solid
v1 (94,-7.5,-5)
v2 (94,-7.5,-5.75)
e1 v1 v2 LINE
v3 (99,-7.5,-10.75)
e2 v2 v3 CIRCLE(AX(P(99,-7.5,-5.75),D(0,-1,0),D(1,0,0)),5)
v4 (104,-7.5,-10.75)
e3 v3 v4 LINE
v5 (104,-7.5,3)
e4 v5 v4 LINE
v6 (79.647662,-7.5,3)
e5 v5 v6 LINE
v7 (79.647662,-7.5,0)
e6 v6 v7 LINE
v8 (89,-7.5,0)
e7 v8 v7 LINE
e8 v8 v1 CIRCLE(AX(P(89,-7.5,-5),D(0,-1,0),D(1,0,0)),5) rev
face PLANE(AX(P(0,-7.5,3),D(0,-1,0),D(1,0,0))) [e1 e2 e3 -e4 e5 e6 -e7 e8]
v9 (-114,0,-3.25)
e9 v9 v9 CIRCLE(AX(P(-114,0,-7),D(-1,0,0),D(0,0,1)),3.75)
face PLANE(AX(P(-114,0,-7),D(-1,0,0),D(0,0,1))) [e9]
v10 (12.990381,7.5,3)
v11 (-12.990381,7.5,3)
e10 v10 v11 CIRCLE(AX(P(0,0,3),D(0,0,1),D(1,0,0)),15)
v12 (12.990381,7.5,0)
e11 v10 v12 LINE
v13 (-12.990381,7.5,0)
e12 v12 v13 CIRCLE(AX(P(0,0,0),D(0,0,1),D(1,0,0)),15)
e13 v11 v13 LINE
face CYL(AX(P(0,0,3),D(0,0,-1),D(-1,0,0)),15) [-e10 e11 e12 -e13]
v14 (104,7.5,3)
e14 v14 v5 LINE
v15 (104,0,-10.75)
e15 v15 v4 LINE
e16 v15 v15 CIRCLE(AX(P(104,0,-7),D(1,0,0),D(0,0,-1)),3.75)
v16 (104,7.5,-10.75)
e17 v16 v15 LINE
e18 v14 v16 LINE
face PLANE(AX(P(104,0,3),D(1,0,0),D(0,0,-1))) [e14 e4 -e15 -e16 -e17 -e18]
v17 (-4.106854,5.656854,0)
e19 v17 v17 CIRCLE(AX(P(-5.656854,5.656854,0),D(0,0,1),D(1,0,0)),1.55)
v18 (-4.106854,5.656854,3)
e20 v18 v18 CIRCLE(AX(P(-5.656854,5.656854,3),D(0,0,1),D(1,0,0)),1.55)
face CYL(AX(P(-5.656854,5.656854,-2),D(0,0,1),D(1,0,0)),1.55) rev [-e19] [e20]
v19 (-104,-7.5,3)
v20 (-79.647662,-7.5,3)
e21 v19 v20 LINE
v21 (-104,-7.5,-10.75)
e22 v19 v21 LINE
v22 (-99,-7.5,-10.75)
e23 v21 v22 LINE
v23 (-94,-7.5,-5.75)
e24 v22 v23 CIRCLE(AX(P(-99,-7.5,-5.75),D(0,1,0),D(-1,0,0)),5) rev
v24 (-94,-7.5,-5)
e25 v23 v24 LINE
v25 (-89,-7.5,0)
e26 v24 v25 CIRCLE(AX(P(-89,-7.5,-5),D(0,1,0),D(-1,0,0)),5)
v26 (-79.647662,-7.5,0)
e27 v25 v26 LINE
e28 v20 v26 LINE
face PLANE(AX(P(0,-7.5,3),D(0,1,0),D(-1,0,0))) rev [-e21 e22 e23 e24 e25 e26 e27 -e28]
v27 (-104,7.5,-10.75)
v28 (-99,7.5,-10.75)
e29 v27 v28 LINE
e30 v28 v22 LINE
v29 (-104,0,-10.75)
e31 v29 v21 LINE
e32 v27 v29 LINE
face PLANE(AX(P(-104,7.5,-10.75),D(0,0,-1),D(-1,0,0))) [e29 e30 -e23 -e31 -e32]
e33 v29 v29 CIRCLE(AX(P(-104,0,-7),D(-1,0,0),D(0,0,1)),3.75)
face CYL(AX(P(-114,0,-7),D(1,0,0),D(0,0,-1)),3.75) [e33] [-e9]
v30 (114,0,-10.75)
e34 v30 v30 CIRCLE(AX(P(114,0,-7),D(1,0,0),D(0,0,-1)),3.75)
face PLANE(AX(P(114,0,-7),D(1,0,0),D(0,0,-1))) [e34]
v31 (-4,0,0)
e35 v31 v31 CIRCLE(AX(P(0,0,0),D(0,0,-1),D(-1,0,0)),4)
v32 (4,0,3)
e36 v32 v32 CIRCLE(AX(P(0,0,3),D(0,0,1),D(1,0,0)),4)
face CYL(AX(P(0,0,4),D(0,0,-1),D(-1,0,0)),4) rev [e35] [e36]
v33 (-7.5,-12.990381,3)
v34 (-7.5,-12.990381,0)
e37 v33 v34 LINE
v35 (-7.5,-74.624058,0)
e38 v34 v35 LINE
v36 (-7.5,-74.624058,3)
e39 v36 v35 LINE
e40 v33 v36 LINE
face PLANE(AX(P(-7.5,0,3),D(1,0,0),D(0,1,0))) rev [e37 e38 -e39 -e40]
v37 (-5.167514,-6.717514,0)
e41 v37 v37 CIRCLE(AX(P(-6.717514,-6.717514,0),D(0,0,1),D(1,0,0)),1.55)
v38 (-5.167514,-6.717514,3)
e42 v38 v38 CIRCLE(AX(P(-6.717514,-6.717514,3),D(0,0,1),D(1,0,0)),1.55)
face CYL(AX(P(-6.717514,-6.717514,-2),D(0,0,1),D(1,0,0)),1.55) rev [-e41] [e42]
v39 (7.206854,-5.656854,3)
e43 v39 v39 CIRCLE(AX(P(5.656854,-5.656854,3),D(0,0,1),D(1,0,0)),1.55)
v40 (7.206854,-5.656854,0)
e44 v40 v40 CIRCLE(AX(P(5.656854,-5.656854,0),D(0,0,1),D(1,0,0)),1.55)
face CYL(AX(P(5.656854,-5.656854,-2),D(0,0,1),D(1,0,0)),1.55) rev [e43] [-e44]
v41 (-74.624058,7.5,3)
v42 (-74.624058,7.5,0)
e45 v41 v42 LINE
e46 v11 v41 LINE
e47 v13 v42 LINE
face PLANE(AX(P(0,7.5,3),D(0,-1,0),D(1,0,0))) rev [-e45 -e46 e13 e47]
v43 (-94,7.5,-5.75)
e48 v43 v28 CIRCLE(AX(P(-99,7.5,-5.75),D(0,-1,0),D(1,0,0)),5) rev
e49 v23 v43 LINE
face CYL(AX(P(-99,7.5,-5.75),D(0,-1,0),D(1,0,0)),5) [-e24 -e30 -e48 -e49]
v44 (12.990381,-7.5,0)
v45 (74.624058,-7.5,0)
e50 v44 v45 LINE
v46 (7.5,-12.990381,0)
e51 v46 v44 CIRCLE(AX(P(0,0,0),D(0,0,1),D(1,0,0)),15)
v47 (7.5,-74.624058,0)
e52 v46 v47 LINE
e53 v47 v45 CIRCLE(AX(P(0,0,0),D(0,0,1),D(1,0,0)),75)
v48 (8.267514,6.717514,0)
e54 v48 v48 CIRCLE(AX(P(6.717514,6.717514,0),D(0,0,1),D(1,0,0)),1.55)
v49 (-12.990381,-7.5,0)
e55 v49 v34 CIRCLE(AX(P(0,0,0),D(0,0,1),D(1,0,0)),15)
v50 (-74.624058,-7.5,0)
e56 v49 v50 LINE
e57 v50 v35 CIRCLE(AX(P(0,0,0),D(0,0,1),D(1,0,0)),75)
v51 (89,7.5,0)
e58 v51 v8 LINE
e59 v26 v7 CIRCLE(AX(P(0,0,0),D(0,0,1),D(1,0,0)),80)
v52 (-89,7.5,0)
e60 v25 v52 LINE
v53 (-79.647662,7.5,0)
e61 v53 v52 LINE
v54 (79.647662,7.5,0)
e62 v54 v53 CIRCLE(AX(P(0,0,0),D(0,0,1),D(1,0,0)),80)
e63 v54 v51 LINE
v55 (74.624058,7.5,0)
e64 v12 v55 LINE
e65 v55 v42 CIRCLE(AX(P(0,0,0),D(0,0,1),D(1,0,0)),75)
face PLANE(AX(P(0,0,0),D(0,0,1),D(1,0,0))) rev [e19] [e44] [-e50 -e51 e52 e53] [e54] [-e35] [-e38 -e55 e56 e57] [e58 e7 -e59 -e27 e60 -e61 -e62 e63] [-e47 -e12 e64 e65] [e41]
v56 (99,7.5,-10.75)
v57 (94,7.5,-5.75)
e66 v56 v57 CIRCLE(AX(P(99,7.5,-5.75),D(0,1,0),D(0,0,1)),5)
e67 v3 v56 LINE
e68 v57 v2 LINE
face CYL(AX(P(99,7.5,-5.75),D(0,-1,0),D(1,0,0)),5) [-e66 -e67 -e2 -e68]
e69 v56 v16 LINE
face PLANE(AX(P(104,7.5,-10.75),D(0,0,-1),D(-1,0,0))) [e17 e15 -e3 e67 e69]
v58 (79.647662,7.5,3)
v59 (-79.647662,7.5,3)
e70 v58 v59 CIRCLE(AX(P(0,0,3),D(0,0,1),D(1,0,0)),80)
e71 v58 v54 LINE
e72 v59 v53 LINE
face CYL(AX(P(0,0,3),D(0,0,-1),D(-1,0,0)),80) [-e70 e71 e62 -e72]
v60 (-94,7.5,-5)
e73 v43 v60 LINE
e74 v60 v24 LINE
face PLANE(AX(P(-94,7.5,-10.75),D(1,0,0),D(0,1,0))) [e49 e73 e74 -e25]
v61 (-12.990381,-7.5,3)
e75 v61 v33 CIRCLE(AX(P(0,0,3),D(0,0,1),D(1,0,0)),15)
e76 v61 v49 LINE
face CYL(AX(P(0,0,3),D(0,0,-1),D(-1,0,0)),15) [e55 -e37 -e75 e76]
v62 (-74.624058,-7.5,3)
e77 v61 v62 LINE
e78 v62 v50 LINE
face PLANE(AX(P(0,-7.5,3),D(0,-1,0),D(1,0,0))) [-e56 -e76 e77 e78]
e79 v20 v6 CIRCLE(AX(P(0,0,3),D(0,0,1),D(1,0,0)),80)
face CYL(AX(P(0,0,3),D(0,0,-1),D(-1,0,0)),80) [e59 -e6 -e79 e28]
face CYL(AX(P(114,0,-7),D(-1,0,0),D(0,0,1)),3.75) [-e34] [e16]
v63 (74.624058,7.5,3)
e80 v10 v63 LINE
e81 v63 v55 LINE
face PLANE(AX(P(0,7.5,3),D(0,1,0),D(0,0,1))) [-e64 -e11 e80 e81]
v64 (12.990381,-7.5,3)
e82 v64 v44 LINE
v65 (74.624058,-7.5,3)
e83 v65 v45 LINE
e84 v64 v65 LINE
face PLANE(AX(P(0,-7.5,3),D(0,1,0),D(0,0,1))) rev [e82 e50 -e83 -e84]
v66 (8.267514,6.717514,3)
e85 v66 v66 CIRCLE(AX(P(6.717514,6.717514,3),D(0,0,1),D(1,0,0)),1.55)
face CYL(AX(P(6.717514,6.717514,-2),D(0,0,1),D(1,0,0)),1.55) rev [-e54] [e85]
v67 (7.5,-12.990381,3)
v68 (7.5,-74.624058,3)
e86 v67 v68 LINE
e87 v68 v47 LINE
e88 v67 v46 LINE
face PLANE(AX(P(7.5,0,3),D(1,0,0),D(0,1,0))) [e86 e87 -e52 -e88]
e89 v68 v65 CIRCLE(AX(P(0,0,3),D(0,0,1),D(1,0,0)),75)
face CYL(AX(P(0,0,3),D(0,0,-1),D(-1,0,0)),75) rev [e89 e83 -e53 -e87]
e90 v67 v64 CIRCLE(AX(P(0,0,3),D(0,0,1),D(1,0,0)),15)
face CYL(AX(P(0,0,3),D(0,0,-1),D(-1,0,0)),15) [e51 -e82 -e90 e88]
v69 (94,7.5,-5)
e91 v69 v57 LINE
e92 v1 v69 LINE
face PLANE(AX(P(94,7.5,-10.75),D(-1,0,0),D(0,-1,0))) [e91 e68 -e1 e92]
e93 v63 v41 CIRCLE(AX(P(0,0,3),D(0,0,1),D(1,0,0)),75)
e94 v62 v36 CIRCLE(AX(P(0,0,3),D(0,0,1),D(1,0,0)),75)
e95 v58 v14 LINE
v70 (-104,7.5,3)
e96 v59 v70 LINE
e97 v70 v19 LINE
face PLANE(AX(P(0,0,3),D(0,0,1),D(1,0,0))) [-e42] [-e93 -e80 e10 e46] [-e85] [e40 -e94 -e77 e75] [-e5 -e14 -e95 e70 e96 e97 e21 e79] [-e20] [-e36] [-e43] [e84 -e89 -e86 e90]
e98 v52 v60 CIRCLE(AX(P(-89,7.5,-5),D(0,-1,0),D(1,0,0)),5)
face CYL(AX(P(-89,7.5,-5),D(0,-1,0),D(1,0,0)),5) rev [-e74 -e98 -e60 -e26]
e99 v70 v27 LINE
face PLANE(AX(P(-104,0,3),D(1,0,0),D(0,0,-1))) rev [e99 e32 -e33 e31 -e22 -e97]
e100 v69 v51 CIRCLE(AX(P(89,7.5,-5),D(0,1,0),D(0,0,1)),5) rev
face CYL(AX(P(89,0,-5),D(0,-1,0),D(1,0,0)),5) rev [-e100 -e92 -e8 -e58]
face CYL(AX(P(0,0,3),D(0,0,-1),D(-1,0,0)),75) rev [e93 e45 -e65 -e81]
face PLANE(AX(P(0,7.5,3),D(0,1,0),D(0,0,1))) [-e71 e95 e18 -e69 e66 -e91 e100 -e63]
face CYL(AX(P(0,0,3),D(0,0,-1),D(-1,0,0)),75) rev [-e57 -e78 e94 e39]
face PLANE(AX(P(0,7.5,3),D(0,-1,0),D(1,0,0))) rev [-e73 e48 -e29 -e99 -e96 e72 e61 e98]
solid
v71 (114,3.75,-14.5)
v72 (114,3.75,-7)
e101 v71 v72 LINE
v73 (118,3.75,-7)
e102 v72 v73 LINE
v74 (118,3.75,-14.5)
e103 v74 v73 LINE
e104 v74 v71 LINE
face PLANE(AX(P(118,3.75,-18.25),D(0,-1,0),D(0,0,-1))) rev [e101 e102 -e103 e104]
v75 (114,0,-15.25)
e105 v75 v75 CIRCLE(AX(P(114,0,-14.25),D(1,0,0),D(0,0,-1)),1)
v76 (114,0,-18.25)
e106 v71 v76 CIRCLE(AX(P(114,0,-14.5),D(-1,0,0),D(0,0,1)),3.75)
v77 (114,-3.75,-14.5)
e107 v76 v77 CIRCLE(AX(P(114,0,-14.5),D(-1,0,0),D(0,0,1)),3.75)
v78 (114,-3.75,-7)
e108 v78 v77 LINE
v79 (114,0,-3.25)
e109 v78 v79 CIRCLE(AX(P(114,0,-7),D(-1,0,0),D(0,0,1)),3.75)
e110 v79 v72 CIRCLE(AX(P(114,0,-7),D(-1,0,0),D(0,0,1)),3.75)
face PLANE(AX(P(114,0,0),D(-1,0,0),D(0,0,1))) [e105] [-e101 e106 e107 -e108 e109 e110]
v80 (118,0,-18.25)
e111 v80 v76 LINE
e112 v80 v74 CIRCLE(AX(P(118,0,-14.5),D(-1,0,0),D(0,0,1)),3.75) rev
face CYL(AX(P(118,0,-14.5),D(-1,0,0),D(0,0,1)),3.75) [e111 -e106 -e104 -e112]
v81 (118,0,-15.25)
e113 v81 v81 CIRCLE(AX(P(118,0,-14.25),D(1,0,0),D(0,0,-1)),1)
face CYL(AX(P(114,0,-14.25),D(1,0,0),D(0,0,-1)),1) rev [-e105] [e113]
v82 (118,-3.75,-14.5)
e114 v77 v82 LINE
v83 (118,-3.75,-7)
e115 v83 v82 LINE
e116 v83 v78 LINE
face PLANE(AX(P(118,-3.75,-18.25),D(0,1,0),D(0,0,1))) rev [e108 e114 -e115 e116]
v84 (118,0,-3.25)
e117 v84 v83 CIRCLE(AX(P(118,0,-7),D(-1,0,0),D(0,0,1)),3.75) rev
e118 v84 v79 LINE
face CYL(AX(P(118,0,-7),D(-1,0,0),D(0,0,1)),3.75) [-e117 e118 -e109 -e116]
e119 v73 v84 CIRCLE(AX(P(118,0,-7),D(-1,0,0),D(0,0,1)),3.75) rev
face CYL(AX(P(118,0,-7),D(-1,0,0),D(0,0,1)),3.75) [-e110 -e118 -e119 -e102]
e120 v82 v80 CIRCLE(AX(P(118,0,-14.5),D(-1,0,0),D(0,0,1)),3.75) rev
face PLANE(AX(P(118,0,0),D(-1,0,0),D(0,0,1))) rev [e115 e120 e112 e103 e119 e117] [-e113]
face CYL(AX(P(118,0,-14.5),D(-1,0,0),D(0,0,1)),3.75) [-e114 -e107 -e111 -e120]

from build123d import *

# Parameters (mm, degrees)
BOSS_EXTRUDE1_DEPTH = 3
SKETCH1_3_R         = 15
BOSS_EXTRUDE2_DEPTH = 3
SKETCH2_R           = 1.55
CUT_EXTRUDE1_DEPTH  = 5
SKETCH4_R           = 3.75
BOSS_EXTRUDE3_DEPTH = 10
SKETCH3_R           = 3.75
BOSS_EXTRUDE4_DEPTH = 10
SKETCH5_W           = 15
SKETCH5_H           = 7.5
BOSS_EXTRUDE5_DEPTH = 4
FILLET2_R           = 3.75
SKETCH8_W           = 10
SKETCH8_H           = 10.75
BOSS_EXTRUDE7_DEPTH = 15
FILLET4_R           = 5
SKETCH7_W           = 10
SKETCH7_H           = 10.75
BOSS_EXTRUDE6_DEPTH = 15
FILLET3_R           = 5
SKETCH6_R           = 1
CUT_EXTRUDE4_DEPTH  = 4
SKETCH9_R           = 4
CUT_EXTRUDE5_DEPTH  = 4


with BuildPart() as part:
    # Sketch1 → Boss-Extrude1 (new body)
    with BuildSketch(Plane.XY):
        with BuildLine():
            Line((104, 7.5), (79.64766161, 7.5))
            ThreePointArc((79.64766161, 7.5), (0, 80), (-79.64766161, 7.5))
            Line((-79.64766161, 7.5), (-104, 7.5))
            Line((-104, 7.5), (-104, -7.5))
            Line((-104, -7.5), (-79.64766161, -7.5))
            ThreePointArc((-79.64766161, -7.5), (0, -80), (79.64766161, -7.5))
            Line((79.64766161, -7.5), (104, -7.5))
            Line((104, -7.5), (104, 7.5))
        make_face()
        with BuildLine():
            ThreePointArc((75, 0), (74.905955483, -3.754708129), (74.624057783, -7.5))
            ThreePointArc((74.624057783, -7.5), (53.033008589, -53.033008589), (7.5, -74.624057783))
            ThreePointArc((7.5, -74.624057783), (0, -75), (-7.5, -74.624057783))
            ThreePointArc((-7.5, -74.624057783), (-53.033008589, -53.033008589), (-74.624057783, -7.5))
            ThreePointArc((-74.624057783, -7.5), (-75, 0), (-74.624057783, 7.5))
            ThreePointArc((-74.624057783, 7.5), (0, 75), (74.624057783, 7.5))
            ThreePointArc((74.624057783, 7.5), (74.905955483, 3.754708129), (75, 0))
        make_face(mode=Mode.SUBTRACT)
    extrude(amount=BOSS_EXTRUDE1_DEPTH)

    # Sketch1<3> → Boss-Extrude2 (add)
    with BuildSketch(Plane.XY):
        with BuildLine():
            Line((-74.624057783, -7.5), (-12.990381057, -7.5))
            ThreePointArc((-12.990381057, -7.5), (-15, 0), (-12.990381057, 7.5))
            Line((-12.990381057, 7.5), (-74.624057783, 7.5))
            ThreePointArc((-74.624057783, 7.5), (-75, 0), (-74.624057783, -7.5))
        make_face()
        Circle(SKETCH1_3_R)
        with BuildLine():
            Line((7.5, -74.624057783), (7.5, -12.990381057))
            ThreePointArc((7.5, -12.990381057), (0, -15), (-7.5, -12.990381057))
            Line((-7.5, -12.990381057), (-7.5, -74.624057783))
            ThreePointArc((-7.5, -74.624057783), (0, -75), (7.5, -74.624057783))
        make_face()
        with BuildLine():
            ThreePointArc((15, 0), (14.488887394, -3.882285677), (12.990381057, -7.5))
            Line((12.990381057, -7.5), (74.624057783, -7.5))
            ThreePointArc((74.624057783, -7.5), (74.905955483, -3.754708129), (75, 0))
            ThreePointArc((75, 0), (74.905955483, 3.754708129), (74.624057783, 7.5))
            Line((74.624057783, 7.5), (12.990381057, 7.5))
            ThreePointArc((12.990381057, 7.5), (14.488887394, 3.882285677), (15, 0))
        make_face()
    extrude(amount=BOSS_EXTRUDE2_DEPTH)

    # Sketch2 → Cut-Extrude1 (cut)
    with BuildSketch(Plane.XY.offset(3)):
        with Locations((-5.656854249, 5.656854249)):
            Circle(SKETCH2_R)
        with Locations((6.717514421, 6.717514421)):
            Circle(SKETCH2_R)
        with Locations((5.656854249, -5.656854249)):
            Circle(SKETCH2_R)
        with Locations((-6.717514421, -6.717514421)):
            Circle(SKETCH2_R)
    extrude(amount=-CUT_EXTRUDE1_DEPTH, mode=Mode.SUBTRACT)



with BuildPart() as body_2:
    # Sketch4 → Boss-Extrude3 (new body)
    with BuildSketch(Plane.ZY.offset(104)):
        with Locations((-7, 0)):
            Circle(SKETCH4_R)
    extrude(amount=BOSS_EXTRUDE3_DEPTH)


with BuildPart() as body_3:
    # Sketch3 → Boss-Extrude4 (new body)
    with BuildSketch(Plane(origin=(104, 0, 0), x_dir=(0, 0, -1), z_dir=(1, 0, 0))):
        with Locations(Location((7, 0, 0), (0, 0, 180))):
            Circle(SKETCH3_R)
    extrude(amount=BOSS_EXTRUDE4_DEPTH)


with BuildPart() as body_4:
    # Sketch5 → Boss-Extrude5 (new body)
    with BuildSketch(Plane(origin=(114, 0, 0), x_dir=(0, 0, -1), z_dir=(1, 0, 0))):
        with Locations((10.75, 0)):
            Rectangle(SKETCH5_W, SKETCH5_H)
    extrude(amount=BOSS_EXTRUDE5_DEPTH)

    # Fillet2
    fillet2_edges = [body_4.edges().sort_by_distance(p)[0] for p in [
        (116, -3.75, -3.25),
        (116, 3.75, -3.25),
        (116, 3.75, -18.25),
        (116, -3.75, -18.25),
    ]]
    fillet(fillet2_edges, radius=FILLET2_R - 0.0001)  # a hair under: the kernel refuses the full size

    # Sketch6 → Cut-Extrude4 (cut)
    with BuildSketch(Plane(origin=(118, 0, 0), x_dir=(0, 0, -1), z_dir=(1, 0, 0))):
        with Locations((14.25, 0)):
            Circle(SKETCH6_R)
    extrude(amount=-CUT_EXTRUDE4_DEPTH, mode=Mode.SUBTRACT)


with BuildPart() as part_1:
    add(part.part)

    add(body_3.part)  # Boss-Extrude7 merges body 3
    # Sketch8 → Boss-Extrude7 (add)
    with BuildSketch(Plane.XZ.offset(7.5)):
        with Locations((99, -5.375)):
            Rectangle(SKETCH8_W, SKETCH8_H)
    extrude(amount=-BOSS_EXTRUDE7_DEPTH)

    # Fillet4
    fillet4_edges = [part_1.edges().sort_by_distance(p)[0] for p in [
        (94, 0, 0),
        (94, 0, -10.75),
    ]]
    fillet(fillet4_edges, radius=FILLET4_R)


    add(body_2.part)  # Boss-Extrude6 merges body 2
    # Sketch7 → Boss-Extrude6 (add)
    with BuildSketch(Plane.XZ.offset(7.5)):
        with Locations((-99, -5.375)):
            Rectangle(SKETCH7_W, SKETCH7_H)
    extrude(amount=-BOSS_EXTRUDE6_DEPTH)

    # Fillet3
    fillet3_edges = [part_1.edges().sort_by_distance(p)[0] for p in [
        (-94, 0, 0),
        (-94, 0, -10.75),
    ]]
    fillet(fillet3_edges, radius=FILLET3_R)

    # Sketch9 → Cut-Extrude5 (cut)
    with BuildSketch(Plane(origin=(0, 0, 0), x_dir=(-1, 0, 0), z_dir=(0, 0, -1))):
        Circle(SKETCH9_R)
    extrude(amount=-CUT_EXTRUDE5_DEPTH, mode=Mode.SUBTRACT)


solid = Compound([body_4.part, part_1.part])
